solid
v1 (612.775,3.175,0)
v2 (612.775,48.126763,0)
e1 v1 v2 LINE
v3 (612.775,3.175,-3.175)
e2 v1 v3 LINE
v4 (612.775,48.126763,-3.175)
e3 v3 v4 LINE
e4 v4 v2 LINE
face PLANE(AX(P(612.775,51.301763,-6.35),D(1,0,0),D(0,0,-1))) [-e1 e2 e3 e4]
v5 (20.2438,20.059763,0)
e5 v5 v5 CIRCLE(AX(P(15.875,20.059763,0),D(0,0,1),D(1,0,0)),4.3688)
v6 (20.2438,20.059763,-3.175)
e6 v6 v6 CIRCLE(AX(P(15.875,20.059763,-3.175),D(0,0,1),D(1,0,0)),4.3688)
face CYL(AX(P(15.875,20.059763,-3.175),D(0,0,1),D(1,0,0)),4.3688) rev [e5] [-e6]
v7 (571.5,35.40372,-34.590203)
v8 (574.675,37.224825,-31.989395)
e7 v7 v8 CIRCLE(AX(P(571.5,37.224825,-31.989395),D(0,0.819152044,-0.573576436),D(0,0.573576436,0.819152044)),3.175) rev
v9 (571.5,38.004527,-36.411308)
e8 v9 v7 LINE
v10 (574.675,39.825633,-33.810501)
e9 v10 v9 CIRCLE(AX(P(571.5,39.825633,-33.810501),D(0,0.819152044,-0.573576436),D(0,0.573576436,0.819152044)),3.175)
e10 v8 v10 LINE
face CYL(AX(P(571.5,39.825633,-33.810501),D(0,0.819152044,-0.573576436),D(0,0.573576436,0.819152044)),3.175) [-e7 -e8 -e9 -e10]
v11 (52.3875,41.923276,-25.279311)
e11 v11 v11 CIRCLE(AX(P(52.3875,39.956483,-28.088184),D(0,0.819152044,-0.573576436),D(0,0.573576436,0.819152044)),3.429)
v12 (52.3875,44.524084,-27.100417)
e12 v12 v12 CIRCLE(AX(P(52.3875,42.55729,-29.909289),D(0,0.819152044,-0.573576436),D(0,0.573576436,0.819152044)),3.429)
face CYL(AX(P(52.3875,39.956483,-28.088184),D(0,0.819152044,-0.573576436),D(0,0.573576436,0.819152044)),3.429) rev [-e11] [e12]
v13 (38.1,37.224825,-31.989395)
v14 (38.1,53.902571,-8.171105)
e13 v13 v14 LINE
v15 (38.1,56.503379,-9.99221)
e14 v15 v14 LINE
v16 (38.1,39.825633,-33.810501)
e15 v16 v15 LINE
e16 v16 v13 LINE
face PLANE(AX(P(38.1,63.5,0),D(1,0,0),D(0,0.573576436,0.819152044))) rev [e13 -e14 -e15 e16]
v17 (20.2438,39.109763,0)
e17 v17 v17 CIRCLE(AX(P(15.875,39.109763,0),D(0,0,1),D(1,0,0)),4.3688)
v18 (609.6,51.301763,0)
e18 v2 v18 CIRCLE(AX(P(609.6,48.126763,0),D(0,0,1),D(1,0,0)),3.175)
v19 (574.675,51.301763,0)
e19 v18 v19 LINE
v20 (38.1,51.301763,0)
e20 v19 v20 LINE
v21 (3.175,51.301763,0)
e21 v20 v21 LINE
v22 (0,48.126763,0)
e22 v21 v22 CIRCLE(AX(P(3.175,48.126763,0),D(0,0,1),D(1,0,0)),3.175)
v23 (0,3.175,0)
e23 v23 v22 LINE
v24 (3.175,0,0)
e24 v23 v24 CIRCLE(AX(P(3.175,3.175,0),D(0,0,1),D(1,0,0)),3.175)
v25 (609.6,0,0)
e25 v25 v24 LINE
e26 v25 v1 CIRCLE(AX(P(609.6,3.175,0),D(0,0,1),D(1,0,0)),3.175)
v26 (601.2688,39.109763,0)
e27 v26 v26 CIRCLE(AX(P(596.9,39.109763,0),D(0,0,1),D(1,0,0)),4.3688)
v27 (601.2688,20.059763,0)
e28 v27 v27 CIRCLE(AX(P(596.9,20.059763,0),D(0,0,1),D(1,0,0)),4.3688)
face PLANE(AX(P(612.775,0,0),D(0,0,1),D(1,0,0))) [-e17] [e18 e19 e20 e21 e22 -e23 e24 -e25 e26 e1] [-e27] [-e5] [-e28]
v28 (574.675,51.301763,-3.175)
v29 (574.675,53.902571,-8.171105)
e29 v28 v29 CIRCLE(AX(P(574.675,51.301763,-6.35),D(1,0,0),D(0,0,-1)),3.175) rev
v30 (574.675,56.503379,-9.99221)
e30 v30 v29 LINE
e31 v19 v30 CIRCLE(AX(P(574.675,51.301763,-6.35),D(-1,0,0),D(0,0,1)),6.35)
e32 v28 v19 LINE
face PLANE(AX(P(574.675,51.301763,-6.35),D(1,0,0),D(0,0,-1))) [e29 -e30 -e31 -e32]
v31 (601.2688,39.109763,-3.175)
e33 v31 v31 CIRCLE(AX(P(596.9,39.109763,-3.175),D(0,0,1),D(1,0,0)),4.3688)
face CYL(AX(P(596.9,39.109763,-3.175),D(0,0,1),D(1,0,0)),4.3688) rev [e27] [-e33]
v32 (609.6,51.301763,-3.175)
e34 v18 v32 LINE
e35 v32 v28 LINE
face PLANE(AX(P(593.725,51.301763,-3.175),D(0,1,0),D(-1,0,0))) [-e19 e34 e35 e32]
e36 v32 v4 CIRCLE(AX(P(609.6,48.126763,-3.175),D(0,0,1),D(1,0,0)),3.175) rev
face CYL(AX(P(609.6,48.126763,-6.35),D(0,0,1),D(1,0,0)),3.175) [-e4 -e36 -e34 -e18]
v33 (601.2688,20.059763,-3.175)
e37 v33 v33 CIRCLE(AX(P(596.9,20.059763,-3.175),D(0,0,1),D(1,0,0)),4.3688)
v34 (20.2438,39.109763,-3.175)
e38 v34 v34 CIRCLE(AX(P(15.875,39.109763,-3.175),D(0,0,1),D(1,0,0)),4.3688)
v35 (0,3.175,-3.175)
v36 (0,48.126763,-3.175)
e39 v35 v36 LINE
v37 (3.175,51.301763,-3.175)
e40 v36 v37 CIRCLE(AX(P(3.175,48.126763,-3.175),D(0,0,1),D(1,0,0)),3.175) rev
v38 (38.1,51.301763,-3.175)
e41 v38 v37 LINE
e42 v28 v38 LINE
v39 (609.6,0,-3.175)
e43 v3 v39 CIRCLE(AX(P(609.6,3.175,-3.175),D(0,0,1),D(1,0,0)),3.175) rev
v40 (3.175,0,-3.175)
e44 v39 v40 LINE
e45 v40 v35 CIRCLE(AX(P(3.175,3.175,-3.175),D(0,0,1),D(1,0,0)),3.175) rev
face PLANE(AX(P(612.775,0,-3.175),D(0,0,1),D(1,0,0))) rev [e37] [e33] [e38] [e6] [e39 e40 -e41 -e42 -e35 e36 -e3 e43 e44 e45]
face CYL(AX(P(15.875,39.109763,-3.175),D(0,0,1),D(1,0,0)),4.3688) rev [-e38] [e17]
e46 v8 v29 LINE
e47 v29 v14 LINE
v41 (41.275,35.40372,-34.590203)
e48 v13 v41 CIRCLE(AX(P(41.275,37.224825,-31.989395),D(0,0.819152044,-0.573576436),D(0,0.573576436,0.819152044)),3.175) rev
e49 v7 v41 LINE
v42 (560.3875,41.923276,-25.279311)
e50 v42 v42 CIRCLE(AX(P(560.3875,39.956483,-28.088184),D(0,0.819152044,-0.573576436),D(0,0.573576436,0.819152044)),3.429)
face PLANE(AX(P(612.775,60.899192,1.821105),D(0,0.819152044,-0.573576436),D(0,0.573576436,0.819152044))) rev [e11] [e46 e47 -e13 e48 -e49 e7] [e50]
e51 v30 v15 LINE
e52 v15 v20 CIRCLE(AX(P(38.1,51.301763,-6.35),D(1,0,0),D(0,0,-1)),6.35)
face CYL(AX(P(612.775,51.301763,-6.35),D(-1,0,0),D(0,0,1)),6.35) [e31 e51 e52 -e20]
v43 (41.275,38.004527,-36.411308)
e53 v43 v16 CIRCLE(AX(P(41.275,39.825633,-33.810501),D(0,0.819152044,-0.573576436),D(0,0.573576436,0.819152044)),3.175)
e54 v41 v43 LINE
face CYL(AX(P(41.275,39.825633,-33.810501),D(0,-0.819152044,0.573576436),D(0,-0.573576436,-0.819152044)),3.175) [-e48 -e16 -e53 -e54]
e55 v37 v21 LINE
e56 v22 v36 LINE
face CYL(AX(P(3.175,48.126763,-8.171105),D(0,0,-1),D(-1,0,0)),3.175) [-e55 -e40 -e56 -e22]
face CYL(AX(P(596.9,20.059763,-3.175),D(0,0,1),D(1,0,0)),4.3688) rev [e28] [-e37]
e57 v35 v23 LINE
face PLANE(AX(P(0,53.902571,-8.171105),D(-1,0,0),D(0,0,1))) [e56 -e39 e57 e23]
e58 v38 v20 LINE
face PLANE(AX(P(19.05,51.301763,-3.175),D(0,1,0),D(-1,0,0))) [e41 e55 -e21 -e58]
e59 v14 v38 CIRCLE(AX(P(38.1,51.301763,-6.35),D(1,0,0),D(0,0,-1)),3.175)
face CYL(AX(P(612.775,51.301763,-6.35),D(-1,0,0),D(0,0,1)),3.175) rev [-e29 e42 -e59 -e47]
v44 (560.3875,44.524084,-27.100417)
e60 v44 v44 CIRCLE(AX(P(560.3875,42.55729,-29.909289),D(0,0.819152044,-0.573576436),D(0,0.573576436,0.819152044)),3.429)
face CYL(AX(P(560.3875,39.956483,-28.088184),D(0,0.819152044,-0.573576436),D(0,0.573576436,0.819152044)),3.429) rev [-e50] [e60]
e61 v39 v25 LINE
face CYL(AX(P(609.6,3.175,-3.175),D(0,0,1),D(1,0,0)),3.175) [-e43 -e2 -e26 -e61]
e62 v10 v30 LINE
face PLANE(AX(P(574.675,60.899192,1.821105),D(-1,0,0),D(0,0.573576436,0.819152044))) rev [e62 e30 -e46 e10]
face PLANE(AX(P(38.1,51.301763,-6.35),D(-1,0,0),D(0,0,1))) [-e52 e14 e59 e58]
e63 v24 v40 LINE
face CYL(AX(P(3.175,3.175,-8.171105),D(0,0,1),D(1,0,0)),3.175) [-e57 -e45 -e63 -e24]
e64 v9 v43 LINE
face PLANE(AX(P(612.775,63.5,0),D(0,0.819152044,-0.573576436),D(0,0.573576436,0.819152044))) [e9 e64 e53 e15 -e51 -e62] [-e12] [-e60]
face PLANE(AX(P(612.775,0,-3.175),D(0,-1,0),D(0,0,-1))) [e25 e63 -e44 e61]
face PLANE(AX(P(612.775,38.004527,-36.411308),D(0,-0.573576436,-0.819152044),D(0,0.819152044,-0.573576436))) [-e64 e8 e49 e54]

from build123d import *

# Parameters (mm, degrees)
BASE_FLANGE1_DEPTH       = 612.775
CUT_EXTRUDE1_OUTLINE_W   = 38.1
CUT_EXTRUDE1_OUTLINE_H   = 57.651763494
CUT_EXTRUDE1_DEPTH       = 33.236308369
CUT_EXTRUDE1_START       = -3.175
CUT_EXTRUDE1_2_OUTLINE_W = 38.1
CUT_EXTRUDE1_2_OUTLINE_H = 6.35
CUT_EXTRUDE1_2_DEPTH     = 3.175
SKETCH7_R                = 4.3688
CUT_EXTRUDE2_DEPTH       = 3.175
SKETCH8_R                = 3.429
CUT_EXTRUDE3_DEPTH       = 3.175
FILLET1_R                = 3.175


# Read off the part's stored shape, not the designer's step: Cut-Extrude1
# Sheet-metal steps are written as plain solids
with BuildPart() as part:
    # Sketch1 → Base-Flange1 (new body)
    with BuildSketch(Plane(origin=(0, 0, 0), x_dir=(0, 0, -1), z_dir=(1, 0, 0))):
        with BuildLine():
            Line((0, 0), (0, 51.301763494))
            ThreePointArc((0, 51.301763494), (3.417896306, 56.934282284), (9.992210371, 56.503378975))
            Line((9.992210371, 56.503378975), (36.411308369, 38.004527404))
            Line((36.411308369, 38.004527404), (34.590203183, 35.403719664))
            Line((34.590203183, 35.403719664), (8.171105185, 53.902571234))
            ThreePointArc((8.171105185, 53.902571234), (4.883948153, 54.118022889), (3.175, 51.301763494))
            Line((3.175, 51.301763494), (3.175, 0))
            Line((3.175, 0), (0, 0))
        make_face()
    extrude(amount=BASE_FLANGE1_DEPTH)

    # Cut-Extrude1 outline → Cut-Extrude1 (cut)
    with BuildSketch(Plane(origin=(0, 0, -3.175), x_dir=(-1, 0, 0), z_dir=(0, 0, -1))):
        with Locations((-593.725, 28.825881747)):
            Rectangle(CUT_EXTRUDE1_OUTLINE_W, CUT_EXTRUDE1_OUTLINE_H)
        with Locations((-19.05, 28.825881747)):
            Rectangle(CUT_EXTRUDE1_OUTLINE_W, CUT_EXTRUDE1_OUTLINE_H)
    extrude(amount=CUT_EXTRUDE1_DEPTH, mode=Mode.SUBTRACT)

    # Cut-Extrude1 2 outline → Cut-Extrude1 2 (cut)
    with BuildSketch(Plane(origin=(0, 0, -3.175), x_dir=(-1, 0, 0), z_dir=(0, 0, -1)).offset(CUT_EXTRUDE1_START)):
        with Locations((-593.725, 54.476763494)):
            Rectangle(CUT_EXTRUDE1_2_OUTLINE_W, CUT_EXTRUDE1_2_OUTLINE_H)
        with Locations((-19.05, 54.476763494)):
            Rectangle(CUT_EXTRUDE1_2_OUTLINE_W, CUT_EXTRUDE1_2_OUTLINE_H)
    extrude(amount=CUT_EXTRUDE1_2_DEPTH, mode=Mode.SUBTRACT)

    # Sketch7 → Cut-Extrude2 (cut)
    with BuildSketch(Plane.XY):
        with Locations((15.875, 39.109763494)):
            Circle(SKETCH7_R)
        with Locations((15.875, 20.059763494)):
            Circle(SKETCH7_R)
        with Locations((596.9, 39.109763494)):
            Circle(SKETCH7_R)
        with Locations((596.9, 20.059763494)):
            Circle(SKETCH7_R)
    extrude(amount=-CUT_EXTRUDE2_DEPTH, mode=Mode.SUBTRACT)

    # Sketch8 → Cut-Extrude3 (cut)
    with BuildSketch(Plane(origin=(0, 42.609139551, -29.83524071), x_dir=(1, 0, 0), z_dir=(0, 0.819152044288989, -0.5735764363510502))):
        with Locations(Location((560.3875, 0.090396292, 0), (0, 0, 270))):
            Circle(SKETCH8_R)
        with Locations(Location((52.3875, 0.090396292, 0), (0, 0, 270))):
            Circle(SKETCH8_R)
    extrude(amount=-CUT_EXTRUDE3_DEPTH, mode=Mode.SUBTRACT)

    # Fillet1
    fillet1_edges = [part.edges().sort_by_distance(p)[0] for p in [
        (0, 51.301763494, -1.5875),
        (612.775, 51.301763494, -1.5875),
        (612.775, 0, -1.5875),
        (38.1, 36.704123534, -35.500755776),
        (574.675, 36.704123534, -35.500755776),
        (0, 0, -1.5875),
    ]]
    fillet(fillet1_edges, radius=FILLET1_R)


solid = part.part
